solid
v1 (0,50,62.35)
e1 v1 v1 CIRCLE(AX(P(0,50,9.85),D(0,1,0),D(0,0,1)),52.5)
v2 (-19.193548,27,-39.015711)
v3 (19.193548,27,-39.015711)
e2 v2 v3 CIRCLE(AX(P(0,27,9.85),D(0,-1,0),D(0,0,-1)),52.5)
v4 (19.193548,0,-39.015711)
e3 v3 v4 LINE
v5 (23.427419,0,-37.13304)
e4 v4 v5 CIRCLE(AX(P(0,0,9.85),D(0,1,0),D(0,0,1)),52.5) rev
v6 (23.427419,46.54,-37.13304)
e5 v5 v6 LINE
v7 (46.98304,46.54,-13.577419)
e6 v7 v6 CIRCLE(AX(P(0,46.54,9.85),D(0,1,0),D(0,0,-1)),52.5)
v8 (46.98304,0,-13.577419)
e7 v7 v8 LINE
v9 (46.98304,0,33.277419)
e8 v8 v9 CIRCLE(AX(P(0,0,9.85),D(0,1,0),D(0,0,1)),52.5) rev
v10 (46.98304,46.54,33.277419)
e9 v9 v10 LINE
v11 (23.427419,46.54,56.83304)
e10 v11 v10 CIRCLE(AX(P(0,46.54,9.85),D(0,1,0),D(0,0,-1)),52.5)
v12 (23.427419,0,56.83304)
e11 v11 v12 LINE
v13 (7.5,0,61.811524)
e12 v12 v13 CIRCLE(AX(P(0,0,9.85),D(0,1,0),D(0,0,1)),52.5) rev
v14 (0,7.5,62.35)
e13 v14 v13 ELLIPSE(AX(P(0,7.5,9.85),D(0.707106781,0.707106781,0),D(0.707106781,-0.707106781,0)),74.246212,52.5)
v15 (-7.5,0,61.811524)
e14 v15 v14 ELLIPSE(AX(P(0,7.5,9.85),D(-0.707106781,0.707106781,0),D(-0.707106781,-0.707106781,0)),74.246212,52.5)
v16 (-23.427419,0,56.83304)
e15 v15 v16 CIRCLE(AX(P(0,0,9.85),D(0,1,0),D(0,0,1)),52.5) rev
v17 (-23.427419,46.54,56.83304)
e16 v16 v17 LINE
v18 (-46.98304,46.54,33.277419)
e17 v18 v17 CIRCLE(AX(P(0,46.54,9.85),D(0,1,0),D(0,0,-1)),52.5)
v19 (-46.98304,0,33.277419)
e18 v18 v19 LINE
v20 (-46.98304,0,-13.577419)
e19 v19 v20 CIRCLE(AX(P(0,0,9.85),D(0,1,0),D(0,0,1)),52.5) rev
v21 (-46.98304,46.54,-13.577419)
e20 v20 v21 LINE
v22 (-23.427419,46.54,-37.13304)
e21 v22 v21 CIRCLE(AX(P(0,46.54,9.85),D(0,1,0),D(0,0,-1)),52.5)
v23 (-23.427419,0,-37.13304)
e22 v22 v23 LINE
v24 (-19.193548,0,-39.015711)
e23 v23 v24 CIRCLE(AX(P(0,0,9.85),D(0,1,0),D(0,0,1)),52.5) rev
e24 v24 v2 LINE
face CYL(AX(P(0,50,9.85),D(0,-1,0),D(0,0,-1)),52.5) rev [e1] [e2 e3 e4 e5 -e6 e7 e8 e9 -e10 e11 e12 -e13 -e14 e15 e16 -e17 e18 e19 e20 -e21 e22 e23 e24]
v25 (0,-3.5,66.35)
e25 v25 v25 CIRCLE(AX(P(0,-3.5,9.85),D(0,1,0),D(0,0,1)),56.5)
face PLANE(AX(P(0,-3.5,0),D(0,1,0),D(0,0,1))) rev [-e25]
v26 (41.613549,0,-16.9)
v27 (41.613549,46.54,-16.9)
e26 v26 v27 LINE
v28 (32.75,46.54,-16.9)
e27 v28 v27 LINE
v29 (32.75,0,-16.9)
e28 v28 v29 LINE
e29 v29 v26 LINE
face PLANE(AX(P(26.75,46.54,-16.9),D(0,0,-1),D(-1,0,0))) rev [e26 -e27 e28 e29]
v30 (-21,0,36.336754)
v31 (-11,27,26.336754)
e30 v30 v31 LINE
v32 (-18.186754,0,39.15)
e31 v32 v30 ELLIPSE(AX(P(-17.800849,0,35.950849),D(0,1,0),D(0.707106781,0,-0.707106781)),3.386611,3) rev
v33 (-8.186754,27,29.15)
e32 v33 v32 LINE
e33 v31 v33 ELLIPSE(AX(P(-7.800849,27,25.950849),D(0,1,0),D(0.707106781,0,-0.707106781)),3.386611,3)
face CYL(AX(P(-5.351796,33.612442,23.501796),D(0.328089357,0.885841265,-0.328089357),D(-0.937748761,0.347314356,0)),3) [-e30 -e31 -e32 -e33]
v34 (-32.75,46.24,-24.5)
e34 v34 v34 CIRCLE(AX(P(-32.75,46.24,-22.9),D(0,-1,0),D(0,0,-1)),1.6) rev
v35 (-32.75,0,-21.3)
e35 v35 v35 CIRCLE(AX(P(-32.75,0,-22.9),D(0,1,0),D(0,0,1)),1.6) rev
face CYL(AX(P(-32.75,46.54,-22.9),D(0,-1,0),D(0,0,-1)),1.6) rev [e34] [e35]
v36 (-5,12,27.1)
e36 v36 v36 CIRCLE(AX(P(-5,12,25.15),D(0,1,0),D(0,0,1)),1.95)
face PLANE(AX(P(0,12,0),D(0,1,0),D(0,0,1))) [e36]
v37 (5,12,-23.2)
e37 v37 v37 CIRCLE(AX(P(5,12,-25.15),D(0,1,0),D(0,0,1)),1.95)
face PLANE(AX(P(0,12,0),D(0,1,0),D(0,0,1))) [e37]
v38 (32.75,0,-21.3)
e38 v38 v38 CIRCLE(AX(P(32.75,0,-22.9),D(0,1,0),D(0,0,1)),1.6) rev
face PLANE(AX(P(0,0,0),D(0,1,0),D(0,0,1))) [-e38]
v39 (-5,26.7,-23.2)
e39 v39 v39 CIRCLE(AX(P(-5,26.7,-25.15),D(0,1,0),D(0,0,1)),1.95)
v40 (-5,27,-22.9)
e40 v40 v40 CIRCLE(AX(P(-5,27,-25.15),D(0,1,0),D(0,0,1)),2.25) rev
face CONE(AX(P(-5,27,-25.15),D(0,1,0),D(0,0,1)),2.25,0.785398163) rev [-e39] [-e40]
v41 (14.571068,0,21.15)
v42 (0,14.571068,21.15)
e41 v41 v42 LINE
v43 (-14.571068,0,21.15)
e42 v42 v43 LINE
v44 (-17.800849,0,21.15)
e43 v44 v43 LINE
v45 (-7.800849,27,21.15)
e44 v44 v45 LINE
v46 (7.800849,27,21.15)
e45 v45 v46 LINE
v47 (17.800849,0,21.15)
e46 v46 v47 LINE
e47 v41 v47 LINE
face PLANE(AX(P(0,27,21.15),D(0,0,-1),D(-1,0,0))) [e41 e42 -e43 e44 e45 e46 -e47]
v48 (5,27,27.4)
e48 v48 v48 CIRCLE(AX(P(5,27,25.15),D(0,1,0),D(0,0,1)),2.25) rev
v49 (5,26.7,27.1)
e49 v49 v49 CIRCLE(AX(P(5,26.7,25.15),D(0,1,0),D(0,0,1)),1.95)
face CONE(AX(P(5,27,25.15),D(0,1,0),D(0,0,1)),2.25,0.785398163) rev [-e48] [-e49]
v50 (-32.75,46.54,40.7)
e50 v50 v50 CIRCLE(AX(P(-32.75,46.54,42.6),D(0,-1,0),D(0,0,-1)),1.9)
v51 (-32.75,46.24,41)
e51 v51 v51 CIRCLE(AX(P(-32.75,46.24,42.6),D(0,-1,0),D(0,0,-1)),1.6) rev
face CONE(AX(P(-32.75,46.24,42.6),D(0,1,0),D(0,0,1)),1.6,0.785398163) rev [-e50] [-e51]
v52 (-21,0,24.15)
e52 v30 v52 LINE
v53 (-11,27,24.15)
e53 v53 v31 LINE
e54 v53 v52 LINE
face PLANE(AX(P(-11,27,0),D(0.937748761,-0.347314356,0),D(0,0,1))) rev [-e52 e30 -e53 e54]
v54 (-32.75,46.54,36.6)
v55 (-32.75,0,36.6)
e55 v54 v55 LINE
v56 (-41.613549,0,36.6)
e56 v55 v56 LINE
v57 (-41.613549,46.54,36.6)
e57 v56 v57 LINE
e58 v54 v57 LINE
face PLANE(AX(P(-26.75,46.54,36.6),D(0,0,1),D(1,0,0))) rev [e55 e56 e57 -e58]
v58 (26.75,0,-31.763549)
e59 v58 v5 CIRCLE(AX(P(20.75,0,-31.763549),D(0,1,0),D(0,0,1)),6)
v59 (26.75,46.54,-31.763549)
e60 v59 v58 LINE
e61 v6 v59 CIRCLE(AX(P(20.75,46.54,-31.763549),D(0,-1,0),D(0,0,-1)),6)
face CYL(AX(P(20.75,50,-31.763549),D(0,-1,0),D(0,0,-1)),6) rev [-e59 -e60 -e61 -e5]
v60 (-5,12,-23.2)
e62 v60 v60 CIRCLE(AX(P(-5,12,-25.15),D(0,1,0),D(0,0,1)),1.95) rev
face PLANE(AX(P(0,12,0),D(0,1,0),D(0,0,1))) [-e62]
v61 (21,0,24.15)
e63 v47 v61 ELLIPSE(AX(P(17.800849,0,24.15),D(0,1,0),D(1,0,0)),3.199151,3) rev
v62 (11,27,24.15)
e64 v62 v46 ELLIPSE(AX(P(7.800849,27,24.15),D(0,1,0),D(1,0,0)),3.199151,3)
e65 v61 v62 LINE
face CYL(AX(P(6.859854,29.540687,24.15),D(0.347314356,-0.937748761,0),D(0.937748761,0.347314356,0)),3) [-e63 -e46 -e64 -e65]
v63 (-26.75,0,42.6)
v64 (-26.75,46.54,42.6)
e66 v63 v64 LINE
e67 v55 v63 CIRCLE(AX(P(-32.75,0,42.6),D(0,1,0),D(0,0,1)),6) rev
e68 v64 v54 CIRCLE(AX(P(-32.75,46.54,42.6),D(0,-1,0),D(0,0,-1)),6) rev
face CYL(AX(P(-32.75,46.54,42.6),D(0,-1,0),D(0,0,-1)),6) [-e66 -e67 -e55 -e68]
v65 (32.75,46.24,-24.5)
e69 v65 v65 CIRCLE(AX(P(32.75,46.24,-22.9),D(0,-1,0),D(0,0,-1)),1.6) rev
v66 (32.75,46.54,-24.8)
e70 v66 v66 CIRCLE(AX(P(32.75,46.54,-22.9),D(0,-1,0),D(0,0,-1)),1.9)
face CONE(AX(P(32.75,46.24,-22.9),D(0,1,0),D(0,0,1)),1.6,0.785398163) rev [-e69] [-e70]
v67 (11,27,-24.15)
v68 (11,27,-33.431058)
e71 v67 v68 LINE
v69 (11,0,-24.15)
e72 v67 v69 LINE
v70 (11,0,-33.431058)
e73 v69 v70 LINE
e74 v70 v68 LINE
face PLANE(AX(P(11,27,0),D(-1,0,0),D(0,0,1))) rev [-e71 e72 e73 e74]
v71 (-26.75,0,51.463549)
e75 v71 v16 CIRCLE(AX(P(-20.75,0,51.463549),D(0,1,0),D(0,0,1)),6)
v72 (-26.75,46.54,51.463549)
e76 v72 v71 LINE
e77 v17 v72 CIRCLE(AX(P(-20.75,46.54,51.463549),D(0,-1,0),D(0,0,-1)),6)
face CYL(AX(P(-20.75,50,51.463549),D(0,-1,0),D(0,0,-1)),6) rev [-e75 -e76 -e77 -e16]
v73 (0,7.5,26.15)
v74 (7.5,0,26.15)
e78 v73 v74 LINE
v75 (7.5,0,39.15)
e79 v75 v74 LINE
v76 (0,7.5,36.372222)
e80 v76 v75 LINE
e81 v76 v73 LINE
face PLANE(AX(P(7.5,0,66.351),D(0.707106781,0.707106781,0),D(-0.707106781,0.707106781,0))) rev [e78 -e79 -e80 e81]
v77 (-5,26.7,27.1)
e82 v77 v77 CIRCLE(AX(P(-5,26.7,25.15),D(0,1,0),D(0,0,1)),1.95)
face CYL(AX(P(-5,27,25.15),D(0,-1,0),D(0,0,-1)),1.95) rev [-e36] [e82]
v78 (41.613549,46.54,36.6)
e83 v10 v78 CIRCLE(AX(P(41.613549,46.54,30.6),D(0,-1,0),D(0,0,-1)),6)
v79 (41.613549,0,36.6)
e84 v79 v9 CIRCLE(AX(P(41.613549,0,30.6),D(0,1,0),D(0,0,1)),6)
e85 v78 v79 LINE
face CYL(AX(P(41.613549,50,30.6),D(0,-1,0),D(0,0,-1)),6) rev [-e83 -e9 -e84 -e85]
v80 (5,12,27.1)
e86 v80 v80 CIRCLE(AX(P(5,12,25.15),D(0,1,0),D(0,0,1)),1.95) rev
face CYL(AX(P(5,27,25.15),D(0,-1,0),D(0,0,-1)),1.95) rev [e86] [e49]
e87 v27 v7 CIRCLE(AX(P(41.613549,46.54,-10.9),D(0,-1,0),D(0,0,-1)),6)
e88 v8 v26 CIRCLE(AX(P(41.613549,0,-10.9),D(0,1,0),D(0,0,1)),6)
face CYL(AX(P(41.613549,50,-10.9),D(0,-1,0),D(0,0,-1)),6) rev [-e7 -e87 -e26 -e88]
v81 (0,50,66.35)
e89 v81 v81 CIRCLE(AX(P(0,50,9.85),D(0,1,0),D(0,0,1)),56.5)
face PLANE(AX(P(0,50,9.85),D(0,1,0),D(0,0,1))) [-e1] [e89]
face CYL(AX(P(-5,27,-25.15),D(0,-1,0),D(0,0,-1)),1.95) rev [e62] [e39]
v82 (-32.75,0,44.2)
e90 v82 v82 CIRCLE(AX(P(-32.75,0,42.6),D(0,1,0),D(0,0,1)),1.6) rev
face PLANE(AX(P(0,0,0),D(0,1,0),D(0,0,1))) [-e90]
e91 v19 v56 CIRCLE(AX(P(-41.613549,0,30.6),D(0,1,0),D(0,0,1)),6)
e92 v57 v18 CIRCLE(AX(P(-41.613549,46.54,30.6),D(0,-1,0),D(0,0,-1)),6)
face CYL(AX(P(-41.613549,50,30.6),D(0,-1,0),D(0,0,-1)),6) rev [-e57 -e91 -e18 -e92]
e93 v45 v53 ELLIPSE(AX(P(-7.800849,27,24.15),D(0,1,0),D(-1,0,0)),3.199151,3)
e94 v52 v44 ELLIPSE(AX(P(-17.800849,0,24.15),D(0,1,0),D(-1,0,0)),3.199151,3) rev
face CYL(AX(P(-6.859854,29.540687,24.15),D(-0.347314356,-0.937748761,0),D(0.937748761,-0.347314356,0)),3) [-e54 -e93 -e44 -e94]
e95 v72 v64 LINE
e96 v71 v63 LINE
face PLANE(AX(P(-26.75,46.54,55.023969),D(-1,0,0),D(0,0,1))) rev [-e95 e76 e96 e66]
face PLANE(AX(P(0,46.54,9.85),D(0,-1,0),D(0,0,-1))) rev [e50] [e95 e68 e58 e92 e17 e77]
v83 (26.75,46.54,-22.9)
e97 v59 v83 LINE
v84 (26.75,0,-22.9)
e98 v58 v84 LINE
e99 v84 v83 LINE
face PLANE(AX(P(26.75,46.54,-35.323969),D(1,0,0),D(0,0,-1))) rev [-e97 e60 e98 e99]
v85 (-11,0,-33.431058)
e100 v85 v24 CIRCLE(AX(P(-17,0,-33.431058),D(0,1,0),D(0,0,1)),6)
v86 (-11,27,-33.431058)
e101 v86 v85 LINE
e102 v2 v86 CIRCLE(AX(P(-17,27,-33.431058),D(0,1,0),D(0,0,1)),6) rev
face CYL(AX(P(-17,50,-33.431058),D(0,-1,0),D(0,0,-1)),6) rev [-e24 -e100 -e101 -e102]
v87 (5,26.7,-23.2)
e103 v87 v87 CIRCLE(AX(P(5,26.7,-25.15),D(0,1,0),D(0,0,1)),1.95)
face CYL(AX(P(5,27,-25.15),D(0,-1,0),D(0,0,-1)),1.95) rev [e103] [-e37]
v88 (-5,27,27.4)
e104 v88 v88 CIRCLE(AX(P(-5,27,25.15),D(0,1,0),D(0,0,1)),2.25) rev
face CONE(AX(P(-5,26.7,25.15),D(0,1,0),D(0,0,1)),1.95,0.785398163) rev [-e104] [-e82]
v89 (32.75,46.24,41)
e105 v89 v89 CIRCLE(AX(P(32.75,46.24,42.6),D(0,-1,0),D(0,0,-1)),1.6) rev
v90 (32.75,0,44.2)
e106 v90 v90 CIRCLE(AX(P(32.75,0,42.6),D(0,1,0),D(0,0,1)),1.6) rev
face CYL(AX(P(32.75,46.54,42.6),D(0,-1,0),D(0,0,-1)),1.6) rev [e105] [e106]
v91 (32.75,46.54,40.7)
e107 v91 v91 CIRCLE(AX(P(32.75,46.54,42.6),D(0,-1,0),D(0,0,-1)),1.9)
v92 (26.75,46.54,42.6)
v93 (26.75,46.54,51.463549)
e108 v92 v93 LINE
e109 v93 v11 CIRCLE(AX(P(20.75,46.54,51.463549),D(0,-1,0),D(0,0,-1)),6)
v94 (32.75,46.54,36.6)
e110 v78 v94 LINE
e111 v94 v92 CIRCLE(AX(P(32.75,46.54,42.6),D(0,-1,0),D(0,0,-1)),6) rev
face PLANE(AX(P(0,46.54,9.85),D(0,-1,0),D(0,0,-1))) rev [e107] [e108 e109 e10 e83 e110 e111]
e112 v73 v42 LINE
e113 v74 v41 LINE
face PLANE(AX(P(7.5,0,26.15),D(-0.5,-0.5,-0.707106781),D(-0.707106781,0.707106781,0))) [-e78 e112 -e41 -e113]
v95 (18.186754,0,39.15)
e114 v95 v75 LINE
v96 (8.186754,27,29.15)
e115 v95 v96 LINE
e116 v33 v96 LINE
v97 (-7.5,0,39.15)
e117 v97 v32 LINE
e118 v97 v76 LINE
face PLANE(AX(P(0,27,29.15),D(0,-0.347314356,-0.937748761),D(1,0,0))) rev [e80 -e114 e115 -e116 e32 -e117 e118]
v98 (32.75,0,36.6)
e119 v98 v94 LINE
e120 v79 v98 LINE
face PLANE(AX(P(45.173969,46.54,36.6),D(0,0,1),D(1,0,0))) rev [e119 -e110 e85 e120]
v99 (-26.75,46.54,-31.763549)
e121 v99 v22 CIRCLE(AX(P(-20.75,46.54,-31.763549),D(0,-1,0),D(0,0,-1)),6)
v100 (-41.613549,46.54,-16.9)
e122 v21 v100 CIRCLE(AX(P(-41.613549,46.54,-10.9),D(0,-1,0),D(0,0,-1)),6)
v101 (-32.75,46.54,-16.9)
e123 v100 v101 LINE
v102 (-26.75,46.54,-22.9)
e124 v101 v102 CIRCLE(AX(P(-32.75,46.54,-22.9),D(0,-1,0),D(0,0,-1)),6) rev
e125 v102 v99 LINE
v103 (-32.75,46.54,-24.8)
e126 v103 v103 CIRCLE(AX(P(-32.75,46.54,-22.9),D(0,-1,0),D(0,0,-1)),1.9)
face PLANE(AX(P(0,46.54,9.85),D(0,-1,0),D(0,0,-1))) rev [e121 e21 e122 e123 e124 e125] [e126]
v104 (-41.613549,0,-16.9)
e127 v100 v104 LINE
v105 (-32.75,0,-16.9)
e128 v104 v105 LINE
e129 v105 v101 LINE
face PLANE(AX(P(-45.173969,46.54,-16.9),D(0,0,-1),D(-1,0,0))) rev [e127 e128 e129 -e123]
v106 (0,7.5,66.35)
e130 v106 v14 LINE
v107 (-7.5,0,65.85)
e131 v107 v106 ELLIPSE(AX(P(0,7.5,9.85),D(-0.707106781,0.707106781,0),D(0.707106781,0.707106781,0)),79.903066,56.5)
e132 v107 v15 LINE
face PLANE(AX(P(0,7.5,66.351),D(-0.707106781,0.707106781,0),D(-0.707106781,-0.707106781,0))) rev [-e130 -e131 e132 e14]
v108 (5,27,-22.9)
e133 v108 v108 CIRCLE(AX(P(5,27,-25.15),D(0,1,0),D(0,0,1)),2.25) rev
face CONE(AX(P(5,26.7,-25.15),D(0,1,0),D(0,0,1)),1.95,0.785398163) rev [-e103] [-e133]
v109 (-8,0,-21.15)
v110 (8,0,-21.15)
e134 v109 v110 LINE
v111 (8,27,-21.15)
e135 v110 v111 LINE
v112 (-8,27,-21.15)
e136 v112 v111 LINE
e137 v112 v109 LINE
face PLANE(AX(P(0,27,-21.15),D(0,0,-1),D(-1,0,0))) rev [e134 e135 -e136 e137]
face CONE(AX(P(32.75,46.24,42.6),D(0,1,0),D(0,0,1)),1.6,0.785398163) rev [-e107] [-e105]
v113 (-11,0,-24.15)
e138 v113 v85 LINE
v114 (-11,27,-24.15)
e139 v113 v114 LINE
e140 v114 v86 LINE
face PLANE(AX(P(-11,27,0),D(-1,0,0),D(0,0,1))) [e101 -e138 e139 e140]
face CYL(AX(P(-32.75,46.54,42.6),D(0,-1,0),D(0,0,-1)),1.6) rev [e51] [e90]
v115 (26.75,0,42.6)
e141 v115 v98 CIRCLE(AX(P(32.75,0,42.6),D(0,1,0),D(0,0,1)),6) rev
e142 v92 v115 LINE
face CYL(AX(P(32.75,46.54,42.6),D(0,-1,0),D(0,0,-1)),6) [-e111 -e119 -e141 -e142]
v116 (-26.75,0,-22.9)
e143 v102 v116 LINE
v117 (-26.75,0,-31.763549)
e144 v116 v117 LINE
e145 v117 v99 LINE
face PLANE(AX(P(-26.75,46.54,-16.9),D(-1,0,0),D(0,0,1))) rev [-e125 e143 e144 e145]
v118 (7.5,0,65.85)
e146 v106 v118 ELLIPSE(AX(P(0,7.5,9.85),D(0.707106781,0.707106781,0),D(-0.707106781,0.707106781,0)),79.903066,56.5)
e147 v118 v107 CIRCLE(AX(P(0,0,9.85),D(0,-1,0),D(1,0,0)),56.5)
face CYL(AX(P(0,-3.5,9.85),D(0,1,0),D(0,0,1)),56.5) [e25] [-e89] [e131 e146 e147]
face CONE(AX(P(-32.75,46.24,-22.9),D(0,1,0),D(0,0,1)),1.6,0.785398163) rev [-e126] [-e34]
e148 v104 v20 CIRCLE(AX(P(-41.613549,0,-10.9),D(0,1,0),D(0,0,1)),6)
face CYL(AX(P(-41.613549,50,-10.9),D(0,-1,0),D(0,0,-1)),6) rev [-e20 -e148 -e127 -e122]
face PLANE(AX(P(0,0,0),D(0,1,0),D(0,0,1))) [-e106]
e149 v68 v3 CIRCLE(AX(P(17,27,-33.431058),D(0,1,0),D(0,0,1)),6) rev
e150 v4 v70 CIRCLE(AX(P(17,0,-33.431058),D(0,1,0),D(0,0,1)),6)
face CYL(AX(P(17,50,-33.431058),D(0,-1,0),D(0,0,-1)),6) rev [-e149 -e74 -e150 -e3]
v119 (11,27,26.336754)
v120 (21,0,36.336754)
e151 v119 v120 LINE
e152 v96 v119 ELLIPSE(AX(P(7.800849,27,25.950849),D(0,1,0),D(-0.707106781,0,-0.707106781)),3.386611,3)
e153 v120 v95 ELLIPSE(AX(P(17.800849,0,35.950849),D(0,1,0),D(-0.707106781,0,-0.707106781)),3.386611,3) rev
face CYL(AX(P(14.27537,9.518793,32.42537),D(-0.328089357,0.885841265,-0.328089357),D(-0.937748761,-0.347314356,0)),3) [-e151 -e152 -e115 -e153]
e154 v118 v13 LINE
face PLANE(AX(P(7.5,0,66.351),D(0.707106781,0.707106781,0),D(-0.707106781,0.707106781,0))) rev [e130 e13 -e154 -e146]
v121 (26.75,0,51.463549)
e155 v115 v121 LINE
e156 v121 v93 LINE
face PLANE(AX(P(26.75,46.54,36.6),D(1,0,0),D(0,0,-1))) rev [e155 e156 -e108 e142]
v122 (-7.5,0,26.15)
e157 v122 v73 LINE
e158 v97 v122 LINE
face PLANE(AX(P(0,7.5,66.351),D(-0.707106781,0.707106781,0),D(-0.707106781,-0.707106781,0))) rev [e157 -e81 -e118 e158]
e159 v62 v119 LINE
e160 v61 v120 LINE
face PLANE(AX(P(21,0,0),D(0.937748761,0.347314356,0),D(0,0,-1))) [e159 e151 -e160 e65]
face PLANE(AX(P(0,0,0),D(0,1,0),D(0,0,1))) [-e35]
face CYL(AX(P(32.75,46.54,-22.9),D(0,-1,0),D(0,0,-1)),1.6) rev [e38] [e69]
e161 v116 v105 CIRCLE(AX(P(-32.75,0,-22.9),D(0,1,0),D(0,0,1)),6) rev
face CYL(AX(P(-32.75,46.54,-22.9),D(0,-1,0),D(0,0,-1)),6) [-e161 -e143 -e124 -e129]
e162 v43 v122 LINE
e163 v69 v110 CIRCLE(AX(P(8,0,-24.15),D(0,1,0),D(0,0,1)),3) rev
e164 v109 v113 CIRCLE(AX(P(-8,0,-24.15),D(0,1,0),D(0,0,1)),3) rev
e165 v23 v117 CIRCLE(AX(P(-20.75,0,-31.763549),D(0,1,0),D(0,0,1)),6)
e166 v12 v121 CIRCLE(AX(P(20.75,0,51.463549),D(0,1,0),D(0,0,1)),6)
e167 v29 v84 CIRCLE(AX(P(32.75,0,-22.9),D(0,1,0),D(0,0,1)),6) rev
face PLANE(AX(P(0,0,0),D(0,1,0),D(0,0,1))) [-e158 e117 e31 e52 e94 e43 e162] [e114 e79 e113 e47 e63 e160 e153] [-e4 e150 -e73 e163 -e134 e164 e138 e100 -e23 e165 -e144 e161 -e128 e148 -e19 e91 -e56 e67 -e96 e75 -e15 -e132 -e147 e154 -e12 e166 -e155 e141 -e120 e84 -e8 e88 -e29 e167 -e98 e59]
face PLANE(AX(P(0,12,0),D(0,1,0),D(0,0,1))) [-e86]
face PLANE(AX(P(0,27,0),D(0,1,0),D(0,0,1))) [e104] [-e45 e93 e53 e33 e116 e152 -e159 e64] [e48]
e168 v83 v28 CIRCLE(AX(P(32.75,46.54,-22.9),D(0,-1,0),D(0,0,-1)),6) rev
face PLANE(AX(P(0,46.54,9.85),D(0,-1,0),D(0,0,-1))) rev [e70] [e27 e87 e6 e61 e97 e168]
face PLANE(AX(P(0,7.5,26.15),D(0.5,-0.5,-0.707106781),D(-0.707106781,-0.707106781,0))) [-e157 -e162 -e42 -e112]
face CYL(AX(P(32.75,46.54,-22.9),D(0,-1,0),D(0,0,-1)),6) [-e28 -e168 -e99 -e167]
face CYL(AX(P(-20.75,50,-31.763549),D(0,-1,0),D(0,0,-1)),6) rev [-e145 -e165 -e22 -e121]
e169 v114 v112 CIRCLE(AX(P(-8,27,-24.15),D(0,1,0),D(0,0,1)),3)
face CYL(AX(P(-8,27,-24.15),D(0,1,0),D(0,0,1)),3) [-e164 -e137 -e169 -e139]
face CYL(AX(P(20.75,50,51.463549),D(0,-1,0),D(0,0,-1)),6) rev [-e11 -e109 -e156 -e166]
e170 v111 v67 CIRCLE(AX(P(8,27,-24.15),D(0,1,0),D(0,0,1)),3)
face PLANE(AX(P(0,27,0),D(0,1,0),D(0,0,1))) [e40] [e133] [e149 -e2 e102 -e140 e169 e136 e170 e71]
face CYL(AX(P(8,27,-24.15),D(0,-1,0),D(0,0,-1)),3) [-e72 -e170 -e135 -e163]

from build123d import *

# Parameters (mm, degrees)
SKETCH1_W               = 22
SKETCH1_H               = 8
SKETCH1_R               = 1.95
BOSS_EXTRUDE1_DEPTH     = 27
BOSS_EXTRUDE1_2_DEPTH   = 27
SKETCH1_4_R             = 1.95
BOSS_EXTRUDE2_DEPTH     = 12
SKETCH3_R               = 56.5
SKETCH3_R_2             = 52.5
BOSS_EXTRUDE3_DEPTH     = 3.5
BOSS_EXTRUDE4_START     = 50
SKETCH3_3_R             = 56.5
SKETCH3_3_R_2           = 52.5
BOSS_EXTRUDE4_DEPTH     = 50
BOSS_EXTRUDE5_START     = 46.54
SKETCH4_R               = 1.6
BOSS_EXTRUDE5_DEPTH     = 46.54
BOSS_EXTRUDE6_REACH     = 123.707
SKETCH5_W               = 22
SKETCH5_H               = 27
FILLET1_R               = 6
CHAMFER1_SIZE2          = 27
CHAMFER1_SIZE           = 10
CHAMFER2_SIZE2          = 27
CHAMFER2_SIZE           = 10
CHAMFER3_SIZE2          = 27
CHAMFER3_SIZE           = 10
CUT_EXTRUDE2_REACH      = 103.435
CUT_EXTRUDE2_END_RADIUS = 56.5
CHAMFER4_SIZE           = 5
CHAMFER5_SIZE           = 0.3
FILLET3_R               = 3


# Some blends are built 0.0001 mm under size
with BuildPart() as part:
    # Sketch1 → Boss-Extrude1 (new body)
    with BuildSketch(Plane(origin=(0, 0, 0), x_dir=(1, 0, 0), z_dir=(0, 1, 0))):
        with Locations((0, -25.15)):
            Rectangle(SKETCH1_W, SKETCH1_H)
        with Locations(Location((-5, -25.15, 0), (0, 0, 270))):
            Circle(SKETCH1_R, mode=Mode.SUBTRACT)
        with Locations(Location((5, -25.15, 0), (0, 0, 90))):
            Circle(SKETCH1_R, mode=Mode.SUBTRACT)
    extrude(amount=BOSS_EXTRUDE1_DEPTH)



with BuildPart() as body_2:
    # Sketch1 → Boss-Extrude1 2 (new body)
    with BuildSketch(Plane(origin=(0, 0, 0), x_dir=(1, 0, 0), z_dir=(0, 1, 0))):
        with Locations((0, 25.15)):
            Rectangle(SKETCH1_W, SKETCH1_H)
        with Locations(Location((5, 25.15, 0), (0, 0, 270))):
            Circle(SKETCH1_R, mode=Mode.SUBTRACT)
        with Locations(Location((-5, 25.15, 0), (0, 0, 90))):
            Circle(SKETCH1_R, mode=Mode.SUBTRACT)
    extrude(amount=BOSS_EXTRUDE1_2_DEPTH)


with BuildPart() as part_1:
    add(part.part)

    add(body_2.part)  # Boss-Extrude2 merges body 2
    # Sketch1<4> → Boss-Extrude2 (add)
    with BuildSketch(Plane(origin=(0, 0, 0), x_dir=(1, 0, 0), z_dir=(0, 1, 0))):
        with Locations(Location((-5, 25.15, 0), (0, 0, 90))):
            Circle(SKETCH1_4_R)
        with Locations(Location((5, 25.15, 0), (0, 0, 270))):
            Circle(SKETCH1_4_R)
        with Locations(Location((-5, -25.15, 0), (0, 0, 270))):
            Circle(SKETCH1_4_R)
        with Locations(Location((5, -25.15, 0), (0, 0, 90))):
            Circle(SKETCH1_4_R)
    extrude(amount=BOSS_EXTRUDE2_DEPTH)

    # Sketch3 → Boss-Extrude3 (add)
    # profile 1 of 2: a face of its own
    with BuildSketch(Plane(origin=(0, 0, 0), x_dir=(1, 0, 0), z_dir=(0, 1, 0))):
        with Locations(Location((0, -9.85, 0), (0, 0, 270))):
            Circle(SKETCH3_R)
        with Locations((0, -9.85)):
            Circle(SKETCH3_R_2, mode=Mode.SUBTRACT)
    # profile 2 of 2: a face of its own
    with BuildSketch(Plane(origin=(0, 0, 0), x_dir=(1, 0, 0), z_dir=(0, 1, 0))):
        with Locations((0, -9.85)):
            Circle(SKETCH3_R_2)
    extrude(amount=-BOSS_EXTRUDE3_DEPTH)

    # Sketch3<3> → Boss-Extrude4 (add)
    with BuildSketch(Plane(origin=(0, 0, 0), x_dir=(1, 0, 0), z_dir=(0, 1, 0)).offset(BOSS_EXTRUDE4_START)):
        with Locations(Location((0, -9.85, 0), (0, 0, 270))):
            Circle(SKETCH3_3_R)
        with Locations(Location((0, -9.85, 0), (0, 0, 270))):
            Circle(SKETCH3_3_R_2, mode=Mode.SUBTRACT)
    extrude(amount=-BOSS_EXTRUDE4_DEPTH)

    # Sketch4 → Boss-Extrude5 (add)
    # profile 1 of 4: a face of its own
    with BuildSketch(Plane(origin=(0, 0, 0), x_dir=(1, 0, 0), z_dir=(0, 1, 0)).offset(BOSS_EXTRUDE5_START)):
        with BuildLine():
            Line((26.75, 35.323969274), (26.75, 16.9))
            Line((26.75, 16.9), (45.173969274, 16.9))
            ThreePointArc((45.173969274, 16.9), (37.123106012, 27.273106012), (26.75, 35.323969274))
        make_face()
        with Locations(Location((32.75, 22.9, 0), (0, 0, 270))):
            Circle(SKETCH4_R, mode=Mode.SUBTRACT)
    # profile 2 of 4: a face of its own
    with BuildSketch(Plane(origin=(0, 0, 0), x_dir=(1, 0, 0), z_dir=(0, 1, 0)).offset(BOSS_EXTRUDE5_START)):
        with BuildLine():
            Line((26.75, -36.6), (26.75, -55.023969274))
            ThreePointArc((26.75, -55.023969274), (37.123106012, -46.973106012), (45.173969274, -36.6))
            Line((45.173969274, -36.6), (26.75, -36.6))
        make_face()
        with Locations(Location((32.75, -42.6, 0), (0, 0, 270))):
            Circle(SKETCH4_R, mode=Mode.SUBTRACT)
    # profile 3 of 4: a face of its own
    with BuildSketch(Plane(origin=(0, 0, 0), x_dir=(1, 0, 0), z_dir=(0, 1, 0)).offset(BOSS_EXTRUDE5_START)):
        with BuildLine():
            Line((-26.75, -36.6), (-45.173969274, -36.6))
            ThreePointArc((-45.173969274, -36.6), (-37.123106012, -46.973106012), (-26.75, -55.023969274))
            Line((-26.75, -55.023969274), (-26.75, -36.6))
        make_face()
        with Locations(Location((-32.75, -42.6, 0), (0, 0, 270))):
            Circle(SKETCH4_R, mode=Mode.SUBTRACT)
    # profile 4 of 4: a face of its own
    with BuildSketch(Plane(origin=(0, 0, 0), x_dir=(1, 0, 0), z_dir=(0, 1, 0)).offset(BOSS_EXTRUDE5_START)):
        with BuildLine():
            Line((-26.75, 16.9), (-26.75, 35.323969274))
            ThreePointArc((-26.75, 35.323969274), (-37.123106012, 27.273106012), (-45.173969274, 16.9))
            Line((-45.173969274, 16.9), (-26.75, 16.9))
        make_face()
        with Locations(Location((-32.75, 22.9, 0), (0, 0, 270))):
            Circle(SKETCH4_R, mode=Mode.SUBTRACT)
    extrude(amount=-BOSS_EXTRUDE5_DEPTH)

    # Sketch5 → Boss-Extrude6 (add, up to next)
    with BuildSketch(Plane(origin=(0, 0, -29.15), x_dir=(-1, 0, 0), z_dir=(0, 0, -1)), mode=Mode.PRIVATE) as boss_extrude6_sk1:
        with Locations((0, 13.5)):
            Rectangle(SKETCH5_W, SKETCH5_H)
    boss_extrude6_tool1 = extrude(boss_extrude6_sk1.sketch, amount=BOSS_EXTRUDE6_REACH, mode=Mode.PRIVATE) - part_1.part
    add(boss_extrude6_tool1.solids().sort_by_distance((0, 13.5, -29.15))[0])

    # Fillet1
    fillet1_edges = [part_1.edges().sort_by_distance(p)[0] for p in [
        (-45.173969274, 23.27, 36.6),
        (-26.75, 23.27, 55.023969274),
        (-26.75, 23.27, 36.6),
        (-26.75, 23.27, -35.323969274),
        (-45.173969274, 23.27, -16.9),
        (-26.75, 23.27, -16.9),
        (11, 13.5, -41.484686129),
        (-11, 13.5, -41.484686129),
        (45.173969274, 23.27, -16.9),
        (26.75, 23.27, -35.323969274),
        (26.75, 23.27, -16.9),
        (26.75, 23.27, 55.023969274),
        (45.173969274, 23.27, 36.6),
        (26.75, 23.27, 36.6),
    ]]
    fillet(fillet1_edges, radius=FILLET1_R)

    # Chamfer1
    chamfer1_edges = [part_1.edges().sort_by_distance(p)[0] for p in [
        (11, 0, 25.15),
    ]]
    chamfer1_side = [part_1.faces().sort_by_distance(p)[0] for p in [
        (11.2, 0, 25.15),
    ]]
    chamfer(chamfer1_edges, length=CHAMFER1_SIZE - 0.0001, length2=CHAMFER1_SIZE2 - 0.0001, reference=chamfer1_side[0])  # a hair under: the kernel refuses the full size

    # Chamfer2
    chamfer2_edges = [part_1.edges().sort_by_distance(p)[0] for p in [
        (-11, 0, 25.15),
    ]]
    chamfer2_side = [part_1.faces().sort_by_distance(p)[0] for p in [
        (-11.2, 0, 25.15),
    ]]
    chamfer(chamfer2_edges, length=CHAMFER2_SIZE - 0.0001, length2=CHAMFER2_SIZE2 - 0.0001, reference=chamfer2_side[0])  # a hair under: the kernel refuses the full size

    # Chamfer3
    chamfer3_edges = [part_1.edges().sort_by_distance(p)[0] for p in [
        (0, 0, 29.15),
    ]]
    chamfer3_side = [part_1.faces().sort_by_distance(p)[0] for p in [
        (0, 0, 29.35),
    ]]
    chamfer(chamfer3_edges, length=CHAMFER3_SIZE - 0.0001, length2=CHAMFER3_SIZE2 - 0.0001, reference=chamfer3_side[0])  # a hair under: the kernel refuses the full size

    # Cut-Extrude2: up to this cylinder (the profile starts inside it)
    cut_extrude2_end = Plane(origin=(0, 2.5, 9.85), z_dir=(0, 1, 0)) * Cylinder(CUT_EXTRUDE2_END_RADIUS, 320.87, mode=Mode.PRIVATE)
    # Sketch6 → Cut-Extrude2 (cut, up to the surface)
    with BuildSketch(Plane(origin=(0, 0, 21.15), x_dir=(-1, 0, 0), z_dir=(0, 0, -1)), mode=Mode.PRIVATE) as cut_extrude2_sk1:
        Polygon((-7.5, 0), (0, 7.5), (7.5, 0), align=None)
    cut_extrude2_tool1 = extrude(cut_extrude2_sk1.sketch, amount=-CUT_EXTRUDE2_REACH, mode=Mode.PRIVATE) & cut_extrude2_end
    add(cut_extrude2_tool1.solids().sort_by_distance((0, 2.5, 21.15))[0], mode=Mode.SUBTRACT)

    # Chamfer4
    chamfer4_edges = [part_1.edges().sort_by_distance(p)[0] for p in [
        (-3.75, 3.75, 21.15),
        (3.75, 3.75, 21.15),
    ]]
    chamfer(chamfer4_edges, length=CHAMFER4_SIZE)

    # Chamfer5
    chamfer5_edges = [part_1.edges().sort_by_distance(p)[0] for p in [
        (-32.75, 46.54, 41),
        (-32.75, 46.54, -24.5),
        (-5, 27, -23.2),
        (5, 27, -27.1),
        (5, 27, 27.1),
        (-5, 27, 23.2),
        (32.75, 46.54, -24.5),
        (32.75, 46.54, 41),
    ]]
    chamfer(chamfer5_edges, length=CHAMFER5_SIZE)

    # Fillet3
    # the kernel refuses this fillet: 3 mm, written as the material it takes off along each edge
    with BuildSketch(Plane(origin=(22.041837298, -2.813248419, 21.15), x_dir=(-0.9377494729497658, -0.34731243280717206, 0), z_dir=(-0.34731243280717206, 0.9377494729497658, 0))) as fillet3_piece_1_section:
        with BuildLine():
            CenterArc((FILLET3_R, FILLET3_R), FILLET3_R, 180, 90)
            Line((0, FILLET3_R), (-FILLET3_R * 0.02, FILLET3_R))
            Line((-FILLET3_R * 0.02, FILLET3_R), (-FILLET3_R * 0.02, -FILLET3_R * 0.02))
            Line((-FILLET3_R * 0.02, -FILLET3_R * 0.02), (FILLET3_R, -FILLET3_R * 0.02))
            Line((FILLET3_R, -FILLET3_R * 0.02), (FILLET3_R, 0))
        make_face()
    fillet3_piece_1 = extrude(amount=34.792231592, mode=Mode.PRIVATE)
    fillet3_piece_1 = split(fillet3_piece_1, bisect_by=Plane(origin=(15.663454903, 0, 21.857594663), z_dir=(0, 1, 0)), keep=Keep.TOP, mode=Mode.PRIVATE)
    add(fillet3_piece_1, mode=Mode.SUBTRACT)
    with BuildSketch(Plane(origin=(-22.041837298, -2.813248419, 21.15), x_dir=(0.9377494729497658, -0.3473124328071721, 0), z_dir=(0.3473124328071721, 0.9377494729497658, 0))) as fillet3_piece_2_section:
        with BuildLine():
            CenterArc((FILLET3_R, -FILLET3_R), FILLET3_R, 90, 90)
            Line((0, -FILLET3_R), (-FILLET3_R * 0.02, -FILLET3_R))
            Line((-FILLET3_R * 0.02, -FILLET3_R), (-FILLET3_R * 0.02, FILLET3_R * 0.02))
            Line((-FILLET3_R * 0.02, FILLET3_R * 0.02), (FILLET3_R, FILLET3_R * 0.02))
            Line((FILLET3_R, FILLET3_R * 0.02), (FILLET3_R, 0))
        make_face()
    fillet3_piece_2 = extrude(amount=34.792231592, mode=Mode.PRIVATE)
    fillet3_piece_2 = split(fillet3_piece_2, bisect_by=Plane(origin=(-15.663454903, 0, 21.857594663), z_dir=(0, 1, 0)), keep=Keep.TOP, mode=Mode.PRIVATE)
    add(fillet3_piece_2, mode=Mode.SUBTRACT)
    with BuildSketch(Plane(origin=(21.871802148, -2.354150623, 40.021802148), x_dir=(0.11394894991381442, -0.3076641019188203, -0.9446472554366656), z_dir=(-0.3280877364303264, 0.8858424659091759, -0.32808773643032624))) as fillet3_piece_3_section:
        with BuildLine():
            CenterArc((FILLET3_R * 0.885842465909, FILLET3_R), FILLET3_R, 186.928227911, 83.071772089)
            Line((-FILLET3_R * 0.106855567725, FILLET3_R * 0.879374074018), (-FILLET3_R * 0.126709528398, FILLET3_R * 0.876961555498))
            Line((-FILLET3_R * 0.126709528398, FILLET3_R * 0.876961555498), (-FILLET3_R * 0.0177168493182, -FILLET3_R * 0.02))
            Line((-FILLET3_R * 0.0177168493182, -FILLET3_R * 0.02), (FILLET3_R * 0.885842465909, -FILLET3_R * 0.02))
            Line((FILLET3_R * 0.885842465909, -FILLET3_R * 0.02), (FILLET3_R * 0.885842465909, 0))
        make_face()
    fillet3_piece_3 = extrude(amount=35.794401902, mode=Mode.PRIVATE)
    fillet3_piece_3 = split(fillet3_piece_3, bisect_by=Plane(origin=(15.900019332, 0, 34.050019332), z_dir=(0, 1, 0)), keep=Keep.TOP, mode=Mode.PRIVATE)
    add(fillet3_piece_3, mode=Mode.SUBTRACT)
    with BuildSketch(Plane(origin=(-21.871802148, -2.354150623, 40.021802148), x_dir=(-0.11394894991381556, -0.3076641019188198, -0.9446472554366654), z_dir=(0.32808773643032646, 0.8858424659091759, -0.32808773643032624))) as fillet3_piece_4_section:
        with BuildLine():
            CenterArc((FILLET3_R * 0.885842465909, -FILLET3_R), FILLET3_R, 90, 83.071772089)
            Line((-FILLET3_R * 0.106855567725, -FILLET3_R * 0.879374074018), (-FILLET3_R * 0.126709528398, -FILLET3_R * 0.876961555498))
            Line((-FILLET3_R * 0.126709528398, -FILLET3_R * 0.876961555498), (-FILLET3_R * 0.0177168493182, FILLET3_R * 0.02))
            Line((-FILLET3_R * 0.0177168493182, FILLET3_R * 0.02), (FILLET3_R * 0.885842465909, FILLET3_R * 0.02))
            Line((FILLET3_R * 0.885842465909, FILLET3_R * 0.02), (FILLET3_R * 0.885842465909, 0))
        make_face()
    fillet3_piece_4 = extrude(amount=35.794401902, mode=Mode.PRIVATE)
    fillet3_piece_4 = split(fillet3_piece_4, bisect_by=Plane(origin=(-15.900019332, 0, 34.050019332), z_dir=(0, 1, 0)), keep=Keep.TOP, mode=Mode.PRIVATE)
    add(fillet3_piece_4, mode=Mode.SUBTRACT)
    with BuildSketch(Plane(origin=(11, 0, -21.15), x_dir=(0, 0, -1), z_dir=(0, 1, 0)), Plane(origin=(-11, 0, -21.15), x_dir=(1, 0, 0), z_dir=(0, 1, 0))) as fillet3_piece_5:
        with BuildLine():
            CenterArc((FILLET3_R, FILLET3_R), FILLET3_R, 180, 90)
            Line((0, FILLET3_R), (-FILLET3_R * 0.02, FILLET3_R))
            Line((-FILLET3_R * 0.02, FILLET3_R), (-FILLET3_R * 0.02, -FILLET3_R * 0.02))
            Line((-FILLET3_R * 0.02, -FILLET3_R * 0.02), (FILLET3_R, -FILLET3_R * 0.02))
            Line((FILLET3_R, -FILLET3_R * 0.02), (FILLET3_R, 0))
        make_face()
    extrude(amount=30, mode=Mode.SUBTRACT)


solid = part_1.part
